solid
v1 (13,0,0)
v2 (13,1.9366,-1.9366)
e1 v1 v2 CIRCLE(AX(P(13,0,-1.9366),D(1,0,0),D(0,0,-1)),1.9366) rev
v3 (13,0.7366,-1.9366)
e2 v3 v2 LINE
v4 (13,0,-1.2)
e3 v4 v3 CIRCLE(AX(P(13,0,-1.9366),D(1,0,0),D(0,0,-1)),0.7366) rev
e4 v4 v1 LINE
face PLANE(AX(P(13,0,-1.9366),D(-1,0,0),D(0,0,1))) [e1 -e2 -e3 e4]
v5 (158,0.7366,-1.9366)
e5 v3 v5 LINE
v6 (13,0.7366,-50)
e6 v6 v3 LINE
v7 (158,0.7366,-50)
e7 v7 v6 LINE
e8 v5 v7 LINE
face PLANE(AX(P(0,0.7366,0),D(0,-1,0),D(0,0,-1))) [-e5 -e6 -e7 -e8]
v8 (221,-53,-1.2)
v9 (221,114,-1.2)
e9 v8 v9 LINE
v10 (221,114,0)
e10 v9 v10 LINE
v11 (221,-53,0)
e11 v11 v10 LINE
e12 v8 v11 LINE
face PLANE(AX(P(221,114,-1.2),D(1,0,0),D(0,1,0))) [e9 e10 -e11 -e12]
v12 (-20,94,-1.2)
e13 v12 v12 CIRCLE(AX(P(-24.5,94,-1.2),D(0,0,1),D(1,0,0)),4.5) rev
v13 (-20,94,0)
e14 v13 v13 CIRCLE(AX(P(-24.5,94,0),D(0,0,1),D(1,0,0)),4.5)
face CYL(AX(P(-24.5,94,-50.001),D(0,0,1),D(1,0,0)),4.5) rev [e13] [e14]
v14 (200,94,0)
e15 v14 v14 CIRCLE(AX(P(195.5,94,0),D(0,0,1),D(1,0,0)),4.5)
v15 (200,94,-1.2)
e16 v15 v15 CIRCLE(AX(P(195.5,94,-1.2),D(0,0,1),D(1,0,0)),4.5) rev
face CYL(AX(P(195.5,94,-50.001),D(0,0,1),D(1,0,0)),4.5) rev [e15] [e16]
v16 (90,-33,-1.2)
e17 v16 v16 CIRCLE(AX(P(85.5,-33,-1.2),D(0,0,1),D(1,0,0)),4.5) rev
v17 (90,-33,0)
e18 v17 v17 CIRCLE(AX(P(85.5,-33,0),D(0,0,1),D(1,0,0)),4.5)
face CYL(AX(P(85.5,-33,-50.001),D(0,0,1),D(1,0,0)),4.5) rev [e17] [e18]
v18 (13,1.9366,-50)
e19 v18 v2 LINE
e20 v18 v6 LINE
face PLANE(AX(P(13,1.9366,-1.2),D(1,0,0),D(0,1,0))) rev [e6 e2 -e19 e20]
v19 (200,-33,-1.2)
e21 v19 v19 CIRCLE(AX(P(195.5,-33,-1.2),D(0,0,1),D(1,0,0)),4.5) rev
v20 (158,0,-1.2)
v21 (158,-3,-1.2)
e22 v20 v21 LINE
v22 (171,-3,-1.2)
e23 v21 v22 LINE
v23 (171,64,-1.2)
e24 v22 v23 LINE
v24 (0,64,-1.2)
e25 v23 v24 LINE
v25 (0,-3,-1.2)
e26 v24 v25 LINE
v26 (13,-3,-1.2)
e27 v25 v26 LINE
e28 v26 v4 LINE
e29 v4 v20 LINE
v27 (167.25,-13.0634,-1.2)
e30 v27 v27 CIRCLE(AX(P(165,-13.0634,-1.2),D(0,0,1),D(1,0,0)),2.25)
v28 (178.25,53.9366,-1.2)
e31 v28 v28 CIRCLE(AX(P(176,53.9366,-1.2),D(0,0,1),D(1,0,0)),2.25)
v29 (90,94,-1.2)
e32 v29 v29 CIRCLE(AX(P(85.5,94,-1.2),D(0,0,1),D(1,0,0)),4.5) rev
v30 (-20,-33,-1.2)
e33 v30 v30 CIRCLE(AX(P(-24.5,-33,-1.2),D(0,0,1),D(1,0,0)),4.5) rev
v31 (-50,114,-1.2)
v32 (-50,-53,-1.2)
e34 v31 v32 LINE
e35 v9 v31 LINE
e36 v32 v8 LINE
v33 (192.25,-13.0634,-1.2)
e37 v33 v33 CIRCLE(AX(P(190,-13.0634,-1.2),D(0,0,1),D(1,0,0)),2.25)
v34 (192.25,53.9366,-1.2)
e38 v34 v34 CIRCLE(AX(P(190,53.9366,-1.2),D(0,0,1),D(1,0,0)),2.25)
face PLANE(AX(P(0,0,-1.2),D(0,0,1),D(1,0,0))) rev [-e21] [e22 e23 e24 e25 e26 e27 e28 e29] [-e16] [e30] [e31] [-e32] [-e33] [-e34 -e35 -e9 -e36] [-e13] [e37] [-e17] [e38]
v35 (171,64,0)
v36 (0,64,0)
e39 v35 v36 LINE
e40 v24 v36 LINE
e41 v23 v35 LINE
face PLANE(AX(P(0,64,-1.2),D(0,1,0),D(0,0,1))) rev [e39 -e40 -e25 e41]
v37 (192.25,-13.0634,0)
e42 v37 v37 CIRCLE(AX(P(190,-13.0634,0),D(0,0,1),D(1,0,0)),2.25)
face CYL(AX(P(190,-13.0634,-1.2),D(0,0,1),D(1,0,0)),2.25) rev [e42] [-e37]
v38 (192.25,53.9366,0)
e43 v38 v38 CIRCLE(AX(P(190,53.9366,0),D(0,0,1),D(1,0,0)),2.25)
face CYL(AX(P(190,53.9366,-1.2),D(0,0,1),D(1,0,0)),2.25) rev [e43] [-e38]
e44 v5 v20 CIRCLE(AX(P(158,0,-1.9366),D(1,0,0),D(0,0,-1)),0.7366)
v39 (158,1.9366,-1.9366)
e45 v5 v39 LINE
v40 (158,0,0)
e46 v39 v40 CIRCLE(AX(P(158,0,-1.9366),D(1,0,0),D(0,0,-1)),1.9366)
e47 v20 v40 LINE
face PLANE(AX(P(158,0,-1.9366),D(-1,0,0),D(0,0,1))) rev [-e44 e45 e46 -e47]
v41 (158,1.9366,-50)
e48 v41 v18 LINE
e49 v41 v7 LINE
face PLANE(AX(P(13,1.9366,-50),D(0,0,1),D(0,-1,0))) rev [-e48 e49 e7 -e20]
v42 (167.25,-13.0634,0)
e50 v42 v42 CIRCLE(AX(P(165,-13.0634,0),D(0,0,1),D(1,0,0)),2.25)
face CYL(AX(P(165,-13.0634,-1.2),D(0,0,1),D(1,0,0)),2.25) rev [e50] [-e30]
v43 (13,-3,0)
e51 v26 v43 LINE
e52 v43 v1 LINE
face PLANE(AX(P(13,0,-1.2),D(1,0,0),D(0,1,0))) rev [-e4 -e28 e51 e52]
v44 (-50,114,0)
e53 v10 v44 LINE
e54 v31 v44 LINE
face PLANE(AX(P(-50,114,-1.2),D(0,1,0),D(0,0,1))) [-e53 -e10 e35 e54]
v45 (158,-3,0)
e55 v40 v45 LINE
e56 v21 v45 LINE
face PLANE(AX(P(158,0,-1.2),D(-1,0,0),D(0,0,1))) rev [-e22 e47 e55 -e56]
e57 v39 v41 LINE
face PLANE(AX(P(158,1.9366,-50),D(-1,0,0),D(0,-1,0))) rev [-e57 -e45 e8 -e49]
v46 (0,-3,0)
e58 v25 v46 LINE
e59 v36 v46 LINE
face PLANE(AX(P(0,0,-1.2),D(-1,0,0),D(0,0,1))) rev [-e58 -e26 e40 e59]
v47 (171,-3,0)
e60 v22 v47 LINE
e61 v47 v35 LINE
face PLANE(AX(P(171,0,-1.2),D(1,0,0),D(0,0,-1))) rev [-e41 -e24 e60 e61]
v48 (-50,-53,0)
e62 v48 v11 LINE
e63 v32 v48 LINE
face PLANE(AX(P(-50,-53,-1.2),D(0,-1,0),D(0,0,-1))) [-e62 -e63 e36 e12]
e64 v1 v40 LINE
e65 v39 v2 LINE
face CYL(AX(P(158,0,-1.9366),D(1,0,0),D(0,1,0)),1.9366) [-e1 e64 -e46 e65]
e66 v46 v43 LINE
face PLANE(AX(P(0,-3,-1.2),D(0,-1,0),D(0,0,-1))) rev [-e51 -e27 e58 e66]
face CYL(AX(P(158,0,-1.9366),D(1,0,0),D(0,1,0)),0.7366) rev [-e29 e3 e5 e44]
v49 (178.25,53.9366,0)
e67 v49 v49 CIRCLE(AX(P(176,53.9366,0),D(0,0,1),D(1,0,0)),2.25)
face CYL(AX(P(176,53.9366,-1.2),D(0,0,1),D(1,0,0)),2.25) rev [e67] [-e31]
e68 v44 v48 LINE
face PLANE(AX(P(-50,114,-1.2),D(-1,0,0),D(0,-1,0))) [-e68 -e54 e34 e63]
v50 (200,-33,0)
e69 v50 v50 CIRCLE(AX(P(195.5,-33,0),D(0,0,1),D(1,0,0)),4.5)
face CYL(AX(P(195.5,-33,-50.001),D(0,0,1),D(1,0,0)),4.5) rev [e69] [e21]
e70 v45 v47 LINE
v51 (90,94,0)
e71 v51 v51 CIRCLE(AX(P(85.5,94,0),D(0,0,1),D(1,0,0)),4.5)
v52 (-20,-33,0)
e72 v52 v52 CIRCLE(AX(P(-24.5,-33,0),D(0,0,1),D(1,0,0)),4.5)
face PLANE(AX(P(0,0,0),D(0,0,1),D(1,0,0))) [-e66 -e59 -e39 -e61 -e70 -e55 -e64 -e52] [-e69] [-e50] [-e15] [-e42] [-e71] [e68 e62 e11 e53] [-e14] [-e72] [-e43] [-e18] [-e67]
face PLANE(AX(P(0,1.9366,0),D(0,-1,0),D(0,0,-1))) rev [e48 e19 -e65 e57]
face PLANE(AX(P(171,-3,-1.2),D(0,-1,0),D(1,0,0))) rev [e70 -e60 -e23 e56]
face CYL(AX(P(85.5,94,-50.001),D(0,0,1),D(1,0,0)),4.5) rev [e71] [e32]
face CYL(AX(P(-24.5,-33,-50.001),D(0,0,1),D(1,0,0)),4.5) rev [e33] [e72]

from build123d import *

# Parameters (mm, degrees)
SKETCH_1_W             = 271
SKETCH_1_H             = 167
SKETCH_1_R             = 2.25
SM_BASE_FLANGE_1_DEPTH = 1.2
SM_EDGE_FLANGE_1_DEPTH = 145
CUT_EXTRUDE_1_REACH    = 255.647
SKETCH_9_R             = 4.5


# Sheet-metal steps are written as plain solids
with BuildPart() as part:
    # Sketch 1 → Базовая кромка1 (new body)
    with BuildSketch(Plane.XY):
        with Locations((85.5, 30.5)):
            Rectangle(SKETCH_1_W, SKETCH_1_H)
        with Locations((176, 53.9366)):
            Circle(SKETCH_1_R, mode=Mode.SUBTRACT)
        with Locations((190, 53.9366)):
            Circle(SKETCH_1_R, mode=Mode.SUBTRACT)
        with Locations((165, -13.0634)):
            Circle(SKETCH_1_R, mode=Mode.SUBTRACT)
        with Locations((190, -13.0634)):
            Circle(SKETCH_1_R, mode=Mode.SUBTRACT)
        Polygon((13, 0), (158, 0), (158, -3), (171, -3), (171, 0), (171, 64), (0, 64), (0, 0), (0, -3), (13, -3), align=None, mode=Mode.SUBTRACT)
    extrude(amount=-SM_BASE_FLANGE_1_DEPTH)

    # Ребро-кромка1 section (across the edge) → Ребро-кромка1 (add)
    with BuildSketch(Plane(origin=(13, 0.7366, -1.2), x_dir=(0, -1, 0), z_dir=(1, 0, 0))):
        with BuildLine():
            Line((-1.2, 0.7366), (-1.2, 48.8))
            Line((-1.2, 48.8), (0, 48.8))
            Line((0, 48.8), (0, 0.7366))
            ThreePointArc((0, 0.7366), (0.215745145, 0.215745145), (0.7366, 0))
            Line((0.7366, 0), (0.7366, -1.2))
            ThreePointArc((0.7366, -1.2), (-0.632782992, -0.632782992), (-1.2, 0.7366))
        make_face()
    extrude(amount=SM_EDGE_FLANGE_1_DEPTH)

    # Эскиз9 → Вырез-Вытянуть1 (cut, up to next)
    with BuildSketch(Plane.XY, mode=Mode.PRIVATE) as cut_extrude_1_sk1:
        with Locations((-24.5, 94)):
            Circle(SKETCH_9_R)
    cut_extrude_1_tool1 = extrude(cut_extrude_1_sk1.sketch, amount=-CUT_EXTRUDE_1_REACH, mode=Mode.PRIVATE) & part.part
    # Эскиз9 → Вырез-Вытянуть1 (cut, up to next)
    with BuildSketch(Plane.XY, mode=Mode.PRIVATE) as cut_extrude_1_sk2:
        with Locations((-24.5, -33)):
            Circle(SKETCH_9_R)
    cut_extrude_1_tool2 = extrude(cut_extrude_1_sk2.sketch, amount=-CUT_EXTRUDE_1_REACH, mode=Mode.PRIVATE) & part.part
    # Эскиз9 → Вырез-Вытянуть1 (cut, up to next)
    with BuildSketch(Plane.XY, mode=Mode.PRIVATE) as cut_extrude_1_sk3:
        with Locations((85.5, -33)):
            Circle(SKETCH_9_R)
    cut_extrude_1_tool3 = extrude(cut_extrude_1_sk3.sketch, amount=-CUT_EXTRUDE_1_REACH, mode=Mode.PRIVATE) & part.part
    # Эскиз9 → Вырез-Вытянуть1 (cut, up to next)
    with BuildSketch(Plane.XY, mode=Mode.PRIVATE) as cut_extrude_1_sk4:
        with Locations((85.5, 94)):
            Circle(SKETCH_9_R)
    cut_extrude_1_tool4 = extrude(cut_extrude_1_sk4.sketch, amount=-CUT_EXTRUDE_1_REACH, mode=Mode.PRIVATE) & part.part
    # Эскиз9 → Вырез-Вытянуть1 (cut, up to next)
    with BuildSketch(Plane.XY, mode=Mode.PRIVATE) as cut_extrude_1_sk5:
        with Locations((195.5, 94)):
            Circle(SKETCH_9_R)
    cut_extrude_1_tool5 = extrude(cut_extrude_1_sk5.sketch, amount=-CUT_EXTRUDE_1_REACH, mode=Mode.PRIVATE) & part.part
    # Эскиз9 → Вырез-Вытянуть1 (cut, up to next)
    with BuildSketch(Plane.XY, mode=Mode.PRIVATE) as cut_extrude_1_sk6:
        with Locations((195.5, -33)):
            Circle(SKETCH_9_R)
    cut_extrude_1_tool6 = extrude(cut_extrude_1_sk6.sketch, amount=-CUT_EXTRUDE_1_REACH, mode=Mode.PRIVATE) & part.part
    add(cut_extrude_1_tool1.solids().sort_by_distance((-24.5, 94, 0))[0], mode=Mode.SUBTRACT)
    add(cut_extrude_1_tool2.solids().sort_by_distance((-24.5, -33, 0))[0], mode=Mode.SUBTRACT)
    add(cut_extrude_1_tool3.solids().sort_by_distance((85.5, -33, 0))[0], mode=Mode.SUBTRACT)
    add(cut_extrude_1_tool4.solids().sort_by_distance((85.5, 94, 0))[0], mode=Mode.SUBTRACT)
    add(cut_extrude_1_tool5.solids().sort_by_distance((195.5, 94, 0))[0], mode=Mode.SUBTRACT)
    add(cut_extrude_1_tool6.solids().sort_by_distance((195.5, -33, 0))[0], mode=Mode.SUBTRACT)


solid = part.part
